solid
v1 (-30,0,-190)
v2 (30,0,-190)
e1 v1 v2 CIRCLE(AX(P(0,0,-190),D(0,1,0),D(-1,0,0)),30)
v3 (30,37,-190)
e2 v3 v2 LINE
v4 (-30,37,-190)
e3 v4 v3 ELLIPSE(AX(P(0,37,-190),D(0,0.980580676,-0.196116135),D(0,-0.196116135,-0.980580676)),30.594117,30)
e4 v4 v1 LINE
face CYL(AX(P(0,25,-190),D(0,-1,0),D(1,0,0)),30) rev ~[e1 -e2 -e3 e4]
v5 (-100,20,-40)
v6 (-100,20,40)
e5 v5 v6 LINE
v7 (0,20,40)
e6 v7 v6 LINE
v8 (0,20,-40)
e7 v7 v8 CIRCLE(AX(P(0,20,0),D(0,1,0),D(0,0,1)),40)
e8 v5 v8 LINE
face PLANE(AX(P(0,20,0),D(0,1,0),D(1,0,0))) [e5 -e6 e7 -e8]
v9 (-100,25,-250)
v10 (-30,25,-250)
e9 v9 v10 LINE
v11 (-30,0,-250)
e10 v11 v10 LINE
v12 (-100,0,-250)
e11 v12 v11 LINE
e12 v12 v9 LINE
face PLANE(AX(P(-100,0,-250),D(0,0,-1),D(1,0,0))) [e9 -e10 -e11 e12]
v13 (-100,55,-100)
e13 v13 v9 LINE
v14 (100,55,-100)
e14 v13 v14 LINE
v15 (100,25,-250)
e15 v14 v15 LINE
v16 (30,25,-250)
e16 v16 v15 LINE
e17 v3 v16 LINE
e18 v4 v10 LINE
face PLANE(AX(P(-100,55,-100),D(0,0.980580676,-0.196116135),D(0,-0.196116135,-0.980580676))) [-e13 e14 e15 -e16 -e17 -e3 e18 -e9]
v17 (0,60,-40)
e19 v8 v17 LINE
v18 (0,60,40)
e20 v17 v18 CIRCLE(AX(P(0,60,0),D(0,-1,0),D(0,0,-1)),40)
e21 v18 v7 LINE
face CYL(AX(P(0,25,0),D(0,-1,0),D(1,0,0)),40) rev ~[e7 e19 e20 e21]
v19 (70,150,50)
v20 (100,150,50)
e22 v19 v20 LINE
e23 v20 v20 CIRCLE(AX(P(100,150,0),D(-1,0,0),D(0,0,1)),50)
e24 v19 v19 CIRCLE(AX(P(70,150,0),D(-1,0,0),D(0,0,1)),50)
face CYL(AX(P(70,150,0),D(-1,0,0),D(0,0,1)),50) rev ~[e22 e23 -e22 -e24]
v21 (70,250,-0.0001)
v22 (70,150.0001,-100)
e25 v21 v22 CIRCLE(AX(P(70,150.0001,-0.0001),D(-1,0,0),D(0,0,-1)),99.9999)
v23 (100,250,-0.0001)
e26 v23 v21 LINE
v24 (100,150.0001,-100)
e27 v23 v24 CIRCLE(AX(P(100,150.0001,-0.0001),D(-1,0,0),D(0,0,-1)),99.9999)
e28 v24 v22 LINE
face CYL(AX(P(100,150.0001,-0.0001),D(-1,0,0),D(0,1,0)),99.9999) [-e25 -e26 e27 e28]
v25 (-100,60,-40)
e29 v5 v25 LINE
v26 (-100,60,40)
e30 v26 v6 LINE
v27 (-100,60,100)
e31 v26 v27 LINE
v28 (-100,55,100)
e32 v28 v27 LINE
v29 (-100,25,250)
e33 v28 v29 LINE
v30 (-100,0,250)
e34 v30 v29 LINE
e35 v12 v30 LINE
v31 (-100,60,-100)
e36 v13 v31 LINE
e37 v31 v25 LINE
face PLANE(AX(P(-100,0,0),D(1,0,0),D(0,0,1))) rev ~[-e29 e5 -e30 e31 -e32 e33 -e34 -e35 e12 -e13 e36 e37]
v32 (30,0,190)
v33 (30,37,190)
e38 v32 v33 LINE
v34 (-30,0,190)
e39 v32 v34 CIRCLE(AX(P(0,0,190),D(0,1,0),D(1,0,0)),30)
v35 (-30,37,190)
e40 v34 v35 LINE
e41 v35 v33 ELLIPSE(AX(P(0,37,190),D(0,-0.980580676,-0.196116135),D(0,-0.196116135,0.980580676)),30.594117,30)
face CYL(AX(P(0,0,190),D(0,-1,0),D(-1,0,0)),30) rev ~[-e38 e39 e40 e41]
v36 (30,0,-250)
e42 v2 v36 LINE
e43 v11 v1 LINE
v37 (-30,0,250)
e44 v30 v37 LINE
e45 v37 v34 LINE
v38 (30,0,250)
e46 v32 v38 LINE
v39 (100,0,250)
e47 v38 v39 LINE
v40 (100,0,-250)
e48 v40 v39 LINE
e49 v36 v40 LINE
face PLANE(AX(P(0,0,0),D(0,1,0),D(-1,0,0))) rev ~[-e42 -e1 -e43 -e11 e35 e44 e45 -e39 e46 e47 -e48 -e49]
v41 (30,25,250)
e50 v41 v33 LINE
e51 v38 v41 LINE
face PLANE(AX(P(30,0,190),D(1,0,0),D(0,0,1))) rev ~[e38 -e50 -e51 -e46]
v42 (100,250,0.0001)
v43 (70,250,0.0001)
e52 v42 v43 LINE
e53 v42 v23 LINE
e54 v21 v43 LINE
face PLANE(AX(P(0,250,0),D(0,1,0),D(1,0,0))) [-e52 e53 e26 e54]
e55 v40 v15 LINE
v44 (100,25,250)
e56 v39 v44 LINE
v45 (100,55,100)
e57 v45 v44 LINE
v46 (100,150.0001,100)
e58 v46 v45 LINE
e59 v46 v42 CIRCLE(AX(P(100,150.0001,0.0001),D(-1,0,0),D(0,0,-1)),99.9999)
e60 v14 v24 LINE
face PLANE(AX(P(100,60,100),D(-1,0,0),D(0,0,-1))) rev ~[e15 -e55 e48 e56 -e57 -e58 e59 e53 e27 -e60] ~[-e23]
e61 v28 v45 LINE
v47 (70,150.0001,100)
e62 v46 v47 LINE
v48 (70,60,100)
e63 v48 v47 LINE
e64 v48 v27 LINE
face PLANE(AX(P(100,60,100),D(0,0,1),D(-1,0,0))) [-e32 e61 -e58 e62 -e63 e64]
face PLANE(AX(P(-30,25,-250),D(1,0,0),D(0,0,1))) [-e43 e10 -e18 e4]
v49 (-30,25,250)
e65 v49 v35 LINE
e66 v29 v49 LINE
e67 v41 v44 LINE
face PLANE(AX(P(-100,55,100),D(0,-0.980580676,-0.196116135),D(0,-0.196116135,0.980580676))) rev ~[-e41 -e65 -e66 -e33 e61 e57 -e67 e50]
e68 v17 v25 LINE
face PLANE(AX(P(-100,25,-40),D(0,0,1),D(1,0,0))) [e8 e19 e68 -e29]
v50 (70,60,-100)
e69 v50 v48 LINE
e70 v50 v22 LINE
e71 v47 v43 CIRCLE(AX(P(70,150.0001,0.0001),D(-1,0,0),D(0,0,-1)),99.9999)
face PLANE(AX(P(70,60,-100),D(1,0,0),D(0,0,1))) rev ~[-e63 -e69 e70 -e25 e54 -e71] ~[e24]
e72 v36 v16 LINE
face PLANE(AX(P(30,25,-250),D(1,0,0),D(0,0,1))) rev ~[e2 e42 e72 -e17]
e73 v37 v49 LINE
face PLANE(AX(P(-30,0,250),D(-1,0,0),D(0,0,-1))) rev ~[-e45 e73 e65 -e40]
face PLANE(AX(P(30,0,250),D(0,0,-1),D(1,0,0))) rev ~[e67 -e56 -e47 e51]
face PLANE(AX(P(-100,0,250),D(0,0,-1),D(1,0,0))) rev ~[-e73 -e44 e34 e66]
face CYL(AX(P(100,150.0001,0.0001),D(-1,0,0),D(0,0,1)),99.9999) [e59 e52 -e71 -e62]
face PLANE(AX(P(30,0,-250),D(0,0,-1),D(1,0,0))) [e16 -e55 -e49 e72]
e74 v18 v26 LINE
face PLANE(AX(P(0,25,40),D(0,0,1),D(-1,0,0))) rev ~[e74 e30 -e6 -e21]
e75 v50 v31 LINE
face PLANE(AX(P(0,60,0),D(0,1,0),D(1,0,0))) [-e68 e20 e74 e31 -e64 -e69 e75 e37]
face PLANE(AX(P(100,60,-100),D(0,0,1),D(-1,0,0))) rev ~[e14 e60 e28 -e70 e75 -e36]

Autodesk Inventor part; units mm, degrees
ref_plane "YZ Plane" through (0, 0, 0) normal (1, 0, 0) x (0, 1, 0)
ref_plane "XZ Plane" through (0, 0, 0) normal (0, 1, 0) x (-1, 0, 0)
ref_plane "XY Plane" through (0, 0, 0) normal (0, 0, 1) x (1, 0, 0)
sketch "Boceto1" plane through (0, 0, 0) normal (0, 1, 0) x (-1, 0, 0)
  line L0 (0, 0) -> (100, 0)
  line L1 (100, 0) -> (100, 250)
  line L2 (100, 250) -> (30, 250)
  line L3 (0, 0) -> (0, 190)
  circle A0 centre (0, 190) radius 30
  line L4 (30, 250) -> (30, 190)
  line L5 (0, 40) -> (100, 40)
  line L6 (-30, 190) -> (-30, 250)
  line L7 (-30, 250) -> (-100, 250)
  line L8 (-100, 250) -> (-100, 0)
  line L9 (-108.7956, 0) -> (-108.7956, 100)
  line L10 (-108.7956, 100) -> (100, 100)
  line L11 (100, 0) -> (100, -250)
  line L12 (100, -250) -> (30, -250)
  circle A1 centre (0, -190) radius 30
  line L13 (30, -250) -> (30, -190)
  line L14 (-30, -190) -> (-30, -250)
  line L15 (-30, -250) -> (-100, -250)
  line L16 (-100, -250) -> (-100, 0)
  point P0 (0, -40)
  point P1 (100, -40)
  point P2 (100, -100)
  dimension "d0" = 100
  dimension "d1" = 250
  dimension "d2" = 70
  dimension "d3" = 190
  dimension "d4" = 60
  dimension "d6" = 70
  dimension "d7" = 100
extrude "Extrusión1" add sketch "Boceto1" along normal blind 25 contours L3 L5 L1 L0 | L0 L11 L12 L13 A1 L14 L15 L16 L8 L10 L3 | L3 L10 L1 L5 | L10 L8 L7 L6 A0 L3 | L3 A0 L4 L2 L1 L10
sketch "Boceto2" plane through (0, 25, 0) normal (0, 1, 0) x (1, 0, 0)
  circle A0 centre (0, 0) radius 40
  line L0 (100, -250) -> (100, 250) projected
  line L1 (100, 0) -> (100, -100)
  line L2 (100, -100) -> (-100, -100)
  line L3 (-100, 250) -> (-100, -250) projected
  line L4 (-40, 0) -> (40, 0)
  line L5 (100, 100) -> (-100, 100)
  line L6 (0, -40) -> (-100, -40)
  line L7 (0, 40) -> (-100, 40)
  dimension "d10" = 80
  dimension "d11" = 100
extrude "Extrusión2" add sketch "Boceto2" along normal blind 35 contours A0 L7 L3 L5 L0 L2 L6
sketch "Boceto3" plane through (0, 25, 0) normal (0, 1, 0) x (1, 0, 0)
  line L0 (-100, 40) -> (0, 40) projected
  circle A0 centre (0, 0) radius 40
  line L1 (0, 40) -> (-100, 40)
  line L2 (0, -40) -> (-100, -40)
  line L3 (-100, 40) -> (-100, -40) projected
  line L4 (-100, 40) -> (-100, -40)
extrude "Extrusión3" cut sketch "Boceto3" against normal blind 5
sketch "Boceto4" plane through (0, 60, 0) normal (0, 1, 0) x (1, 0, 0)
  line L0 (100, 100) -> (-100, 100) projected
  line L1 (100, -100) -> (-100, -100) projected
  line L2 (100, 100) -> (70, 100)
  line L3 (70, 100) -> (70, -100)
  line L4 (70, -100) -> (100, -100)
  line L5 (100, -100) -> (100, 100)
  point P0 (0, 0)
  dimension "d16" = 30
extrude "Extrusión4" add sketch "Boceto4" along normal blind 190
sketch "Boceto5" plane through (70, 60, -100) normal (-1, 0, 0) x (0, 0, 1)
  line L0 (200, 0) -> (0, 0) projected
  line L1 (100, 0) -> (100, 90)
  circle A0 centre (100, 90) radius 50
  point P0 (100, -60)
  dimension "d19" = 90
  dimension "d20" = 100
extrude "Extrusión5" cut sketch "Boceto5" against normal blind 190
fillet "Empalme1" radius 100 2 edges at (85, 250, -100) (85, 250, 100)
sketch "Boceto6" plane through (-100, 0, -250) normal (-1, 0, 0) x (0, 0, 1)
  line L0 (150, 25) -> (150, 60) projected
  line L1 (150, 60) -> (150, 55)
  line L2 (150, 25) -> (0, 25) projected
  line L3 (150, 55) -> (0, 25)
  line L4 (250, 88.3729) -> (250, -17.9249)
  line L5 (350, 25) -> (350, 60)
  line L6 (350, 25) -> (500, 25)
  line L7 (350, 55) -> (500, 25)
  point P0 (250, 0)
  dimension "d24" = 5
extrude "Extrusión6" add sketch "Boceto6" against normal blind 200
sketch "Boceto7" plane through (0, 25, -190) normal (0, -1, 0) x (1, 0, 0)
  line L0 (30, -60) -> (30, 0) projected
  circle A0 centre (0, 0) radius 30
  line L1 (30, 0) -> (30, -60)
  line L2 (-30, -60) -> (30, -60) projected
  line L3 (-30, -60) -> (-100, -60) projected
  line L4 (30, -60) -> (-30, -60)
  line L5 (-30, -60) -> (-30, 0)
  line L6 (105.1195, 190) -> (-118.3663, 190)
  line L7 (30, 440) -> (30, 380)
  circle A1 centre (0, 380) radius 30
  line L8 (-30, 440) -> (30, 440)
  line L9 (-30, 440) -> (-30, 380)
  point P0 (0, 190)
extrude "Extrusión7" cut sketch "Boceto7" against normal blind 200
